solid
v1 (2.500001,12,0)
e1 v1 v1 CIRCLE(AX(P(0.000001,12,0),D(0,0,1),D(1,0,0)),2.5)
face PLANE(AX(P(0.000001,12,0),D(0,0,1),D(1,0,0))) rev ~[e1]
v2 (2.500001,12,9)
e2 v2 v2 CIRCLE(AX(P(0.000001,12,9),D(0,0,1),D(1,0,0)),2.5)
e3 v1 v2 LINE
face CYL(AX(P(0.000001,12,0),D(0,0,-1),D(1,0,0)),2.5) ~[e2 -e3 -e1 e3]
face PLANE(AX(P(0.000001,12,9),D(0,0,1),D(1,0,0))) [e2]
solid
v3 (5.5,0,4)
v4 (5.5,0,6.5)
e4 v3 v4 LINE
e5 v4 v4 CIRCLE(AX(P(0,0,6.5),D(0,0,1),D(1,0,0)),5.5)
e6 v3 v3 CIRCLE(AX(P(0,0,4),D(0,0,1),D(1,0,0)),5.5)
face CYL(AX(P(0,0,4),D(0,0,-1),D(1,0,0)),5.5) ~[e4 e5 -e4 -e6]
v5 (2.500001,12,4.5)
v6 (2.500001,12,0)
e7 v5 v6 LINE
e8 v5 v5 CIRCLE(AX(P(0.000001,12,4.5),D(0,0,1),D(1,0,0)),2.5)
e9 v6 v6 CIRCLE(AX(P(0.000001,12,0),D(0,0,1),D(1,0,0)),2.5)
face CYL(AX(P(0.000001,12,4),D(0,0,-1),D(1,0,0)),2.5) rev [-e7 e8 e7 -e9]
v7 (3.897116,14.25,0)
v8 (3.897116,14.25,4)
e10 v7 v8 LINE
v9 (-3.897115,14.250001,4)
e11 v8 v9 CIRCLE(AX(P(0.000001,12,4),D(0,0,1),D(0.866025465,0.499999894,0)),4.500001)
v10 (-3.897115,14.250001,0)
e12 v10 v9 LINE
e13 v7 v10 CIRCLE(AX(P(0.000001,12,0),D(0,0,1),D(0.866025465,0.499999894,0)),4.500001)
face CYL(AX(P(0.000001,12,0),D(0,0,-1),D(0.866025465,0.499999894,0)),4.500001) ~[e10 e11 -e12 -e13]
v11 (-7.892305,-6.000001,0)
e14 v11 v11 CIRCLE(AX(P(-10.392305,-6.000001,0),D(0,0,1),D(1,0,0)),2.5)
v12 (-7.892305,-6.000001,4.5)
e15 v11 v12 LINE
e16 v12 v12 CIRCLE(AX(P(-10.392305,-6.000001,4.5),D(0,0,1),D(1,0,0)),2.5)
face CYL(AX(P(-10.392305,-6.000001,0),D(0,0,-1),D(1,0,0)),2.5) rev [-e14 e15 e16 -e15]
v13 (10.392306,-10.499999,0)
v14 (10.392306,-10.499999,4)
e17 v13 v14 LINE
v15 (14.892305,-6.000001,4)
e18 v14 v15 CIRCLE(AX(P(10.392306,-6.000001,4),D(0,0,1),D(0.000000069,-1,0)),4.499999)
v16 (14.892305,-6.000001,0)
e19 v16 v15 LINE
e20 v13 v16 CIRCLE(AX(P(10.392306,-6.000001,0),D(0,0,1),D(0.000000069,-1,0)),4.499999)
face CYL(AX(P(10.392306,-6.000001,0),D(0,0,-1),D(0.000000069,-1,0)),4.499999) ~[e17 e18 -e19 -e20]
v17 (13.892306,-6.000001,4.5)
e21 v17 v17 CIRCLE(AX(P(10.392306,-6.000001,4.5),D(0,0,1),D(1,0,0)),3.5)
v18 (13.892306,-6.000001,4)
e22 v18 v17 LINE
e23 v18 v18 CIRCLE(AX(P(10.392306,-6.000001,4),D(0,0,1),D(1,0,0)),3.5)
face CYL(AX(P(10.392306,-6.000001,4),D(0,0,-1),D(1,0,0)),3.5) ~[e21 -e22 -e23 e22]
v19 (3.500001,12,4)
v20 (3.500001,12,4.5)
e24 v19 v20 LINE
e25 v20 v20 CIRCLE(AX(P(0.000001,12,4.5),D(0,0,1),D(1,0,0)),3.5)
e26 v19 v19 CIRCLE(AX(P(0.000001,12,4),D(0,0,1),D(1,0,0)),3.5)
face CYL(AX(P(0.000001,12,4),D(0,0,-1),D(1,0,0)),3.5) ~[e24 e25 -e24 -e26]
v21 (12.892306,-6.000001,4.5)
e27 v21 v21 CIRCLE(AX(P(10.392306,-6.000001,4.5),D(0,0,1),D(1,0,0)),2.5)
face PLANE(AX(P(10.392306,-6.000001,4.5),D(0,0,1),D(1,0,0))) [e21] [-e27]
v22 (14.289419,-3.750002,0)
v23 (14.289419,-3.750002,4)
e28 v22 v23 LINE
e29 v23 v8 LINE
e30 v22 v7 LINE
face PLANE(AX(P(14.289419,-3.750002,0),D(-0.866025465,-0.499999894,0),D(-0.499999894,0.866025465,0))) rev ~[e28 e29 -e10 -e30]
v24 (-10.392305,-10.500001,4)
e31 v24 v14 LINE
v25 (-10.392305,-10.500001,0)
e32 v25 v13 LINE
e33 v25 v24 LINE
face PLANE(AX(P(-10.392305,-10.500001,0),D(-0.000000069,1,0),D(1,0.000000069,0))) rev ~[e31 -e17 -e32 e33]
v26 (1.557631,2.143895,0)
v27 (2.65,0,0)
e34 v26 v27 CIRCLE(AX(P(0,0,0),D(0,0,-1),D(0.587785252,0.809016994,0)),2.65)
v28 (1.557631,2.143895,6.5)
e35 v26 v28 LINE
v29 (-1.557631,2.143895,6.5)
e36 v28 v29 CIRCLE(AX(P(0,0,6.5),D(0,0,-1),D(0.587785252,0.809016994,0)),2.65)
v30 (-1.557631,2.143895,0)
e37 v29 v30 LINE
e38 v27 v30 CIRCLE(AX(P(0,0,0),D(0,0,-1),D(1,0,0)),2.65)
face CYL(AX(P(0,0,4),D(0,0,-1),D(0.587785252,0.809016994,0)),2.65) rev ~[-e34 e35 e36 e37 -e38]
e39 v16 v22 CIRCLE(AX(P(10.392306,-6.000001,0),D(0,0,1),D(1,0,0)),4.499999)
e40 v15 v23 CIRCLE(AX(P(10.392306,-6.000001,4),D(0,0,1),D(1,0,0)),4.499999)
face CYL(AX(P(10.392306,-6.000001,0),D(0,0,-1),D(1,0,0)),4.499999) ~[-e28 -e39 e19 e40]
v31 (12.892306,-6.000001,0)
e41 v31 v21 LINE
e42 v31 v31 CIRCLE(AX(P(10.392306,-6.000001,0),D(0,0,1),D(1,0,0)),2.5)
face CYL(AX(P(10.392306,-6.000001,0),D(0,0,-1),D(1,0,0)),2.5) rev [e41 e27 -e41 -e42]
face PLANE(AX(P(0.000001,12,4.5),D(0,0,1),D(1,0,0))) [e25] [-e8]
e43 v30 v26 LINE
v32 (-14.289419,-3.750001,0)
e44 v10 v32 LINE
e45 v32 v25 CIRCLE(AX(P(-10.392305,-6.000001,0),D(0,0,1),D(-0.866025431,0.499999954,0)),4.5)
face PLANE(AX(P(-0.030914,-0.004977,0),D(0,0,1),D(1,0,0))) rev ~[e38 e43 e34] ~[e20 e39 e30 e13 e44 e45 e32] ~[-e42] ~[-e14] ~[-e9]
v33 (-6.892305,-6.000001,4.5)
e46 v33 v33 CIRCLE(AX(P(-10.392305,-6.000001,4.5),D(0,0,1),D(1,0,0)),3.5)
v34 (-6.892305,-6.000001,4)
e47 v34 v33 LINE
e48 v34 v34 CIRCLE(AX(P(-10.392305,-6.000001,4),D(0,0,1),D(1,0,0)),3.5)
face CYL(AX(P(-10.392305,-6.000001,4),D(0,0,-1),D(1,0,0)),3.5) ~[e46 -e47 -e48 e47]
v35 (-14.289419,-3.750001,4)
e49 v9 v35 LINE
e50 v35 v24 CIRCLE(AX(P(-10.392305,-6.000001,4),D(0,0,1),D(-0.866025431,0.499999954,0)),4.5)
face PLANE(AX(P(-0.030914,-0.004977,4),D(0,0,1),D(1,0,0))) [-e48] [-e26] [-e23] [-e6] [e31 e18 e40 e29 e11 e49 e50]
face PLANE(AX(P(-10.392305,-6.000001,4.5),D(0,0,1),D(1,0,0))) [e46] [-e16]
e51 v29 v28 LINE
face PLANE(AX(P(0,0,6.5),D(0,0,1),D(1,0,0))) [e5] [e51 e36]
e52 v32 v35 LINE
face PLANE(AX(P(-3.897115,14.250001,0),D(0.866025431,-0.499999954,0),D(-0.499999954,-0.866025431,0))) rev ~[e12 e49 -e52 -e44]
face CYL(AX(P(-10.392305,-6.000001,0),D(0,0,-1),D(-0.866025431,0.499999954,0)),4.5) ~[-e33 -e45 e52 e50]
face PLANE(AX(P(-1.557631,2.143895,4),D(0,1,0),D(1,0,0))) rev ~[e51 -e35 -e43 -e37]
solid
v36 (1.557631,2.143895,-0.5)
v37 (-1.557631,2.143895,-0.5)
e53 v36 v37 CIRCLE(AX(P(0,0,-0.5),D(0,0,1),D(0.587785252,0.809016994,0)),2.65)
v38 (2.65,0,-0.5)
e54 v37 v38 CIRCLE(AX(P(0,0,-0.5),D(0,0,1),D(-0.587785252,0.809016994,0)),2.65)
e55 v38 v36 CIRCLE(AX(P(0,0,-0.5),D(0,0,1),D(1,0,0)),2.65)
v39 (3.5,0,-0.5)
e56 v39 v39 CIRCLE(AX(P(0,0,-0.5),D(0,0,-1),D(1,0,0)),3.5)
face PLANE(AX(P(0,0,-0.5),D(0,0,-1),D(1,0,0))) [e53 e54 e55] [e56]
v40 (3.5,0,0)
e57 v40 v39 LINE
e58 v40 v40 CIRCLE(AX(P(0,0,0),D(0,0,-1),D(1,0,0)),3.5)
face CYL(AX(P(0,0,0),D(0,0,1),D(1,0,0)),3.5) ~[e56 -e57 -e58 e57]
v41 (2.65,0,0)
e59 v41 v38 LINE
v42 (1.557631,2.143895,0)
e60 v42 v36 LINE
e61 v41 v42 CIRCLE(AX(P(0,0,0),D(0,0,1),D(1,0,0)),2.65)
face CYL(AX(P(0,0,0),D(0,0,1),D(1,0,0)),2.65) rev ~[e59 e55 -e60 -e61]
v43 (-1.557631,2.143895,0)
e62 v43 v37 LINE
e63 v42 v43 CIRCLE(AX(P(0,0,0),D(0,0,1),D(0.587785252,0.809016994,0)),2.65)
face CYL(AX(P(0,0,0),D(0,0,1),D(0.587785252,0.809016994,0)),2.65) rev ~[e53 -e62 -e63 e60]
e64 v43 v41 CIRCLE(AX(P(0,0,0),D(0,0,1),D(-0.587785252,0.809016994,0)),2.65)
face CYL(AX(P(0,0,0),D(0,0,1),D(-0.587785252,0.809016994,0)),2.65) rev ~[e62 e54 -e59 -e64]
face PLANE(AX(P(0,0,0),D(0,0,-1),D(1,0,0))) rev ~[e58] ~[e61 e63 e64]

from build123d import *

# Parameters (mm, degrees)
F0_R     = 5.5000004034
F0_R_2   = 2.5
F1_DEPTH = 4
F2_R     = 5.5000004034
F3_DEPTH = 2.5
F4_R     = 3.5
F5_DEPTH = 0.5
F2_R_2   = 3.5
F2_R_3   = 2.5
F6_DEPTH = 0.5
F7_DEPTH = 9


# Not quite as in the source:
# - a feature names something its author has since deleted; it is built from what else it names


with BuildPart() as f1:
    # F0 (on Top) → F1 (new body)
    with BuildSketch(Plane.XY):
        with BuildLine():
            ThreePointArc((-14.2894193359, -3.7500009242), (-9.2276193118, -1.6533344658), (-5.8923048983, -6.0000007153))
            ThreePointArc((-5.8923048983, -6.0000007153), (-7.2103242734, -9.1819811212), (-10.3923045885, -10.5000007153))
            Line((-10.3923045885, -10.5000007153), (10.3923063941, -10.4999992847))
            ThreePointArc((10.3923063941, -10.4999992847), (6.4951930666, -3.7500013262), (14.2894194379, -3.7500019077))
            Line((14.2894194379, -3.7500019077), (3.8971161501, 14.2500004833))
            ThreePointArc((3.8971161501, 14.2500004833), (4.3466679585, 13.1646861286), (4.5000017068, 12.0000004034))
            ThreePointArc((4.5000017068, 12.0000004034), (-1.1646852817, 7.6533330781), (-3.8971148091, 14.2500007515))
            Line((-3.8971148091, 14.2500007515), (-14.2894193359, -3.7500009242))
        make_face()
        Circle(F0_R, mode=Mode.SUBTRACT)
        Circle(F0_R)
        with BuildLine():
            ThreePointArc((1.5576309186, 2.1438950351), (2.3611672891, 1.2030748243), (2.65, 0))
            ThreePointArc((2.65, 0), (-1.2030748243, -2.3611672891), (-1.5576309186, 2.1438950351))
            ThreePointArc((-1.5576309186, 2.1438950351), (0, 2.65), (1.5576309186, 2.1438950351))
        make_face(mode=Mode.SUBTRACT)
        with BuildLine():
            ThreePointArc((3.8971161501, 14.2500004833), (7.479e-07, 16.5000015172), (-3.8971148091, 14.2500007515))
            ThreePointArc((-3.8971148091, 14.2500007515), (-1.1646852817, 7.6533330781), (4.5000017068, 12.0000004034))
            ThreePointArc((4.5000017068, 12.0000004034), (4.3466679585, 13.1646861286), (3.8971161501, 14.2500004833))
        make_face()
        with Locations((5.931e-07, 12.0000004034)):
            Circle(F0_R_2, mode=Mode.SUBTRACT)
        with BuildLine():
            ThreePointArc((-10.3923045885, -10.5000007153), (-7.2103242734, -9.1819811212), (-5.8923048983, -6.0000007153))
            ThreePointArc((-5.8923048983, -6.0000007153), (-9.2276193118, -1.6533344658), (-14.2894193359, -3.7500009242))
            ThreePointArc((-14.2894193359, -3.7500009242), (-14.2894190776, -8.2500009539), (-10.3923045885, -10.5000007153))
        make_face()
        with Locations((-10.3923048983, -6.0000007153)):
            Circle(F0_R_2, mode=Mode.SUBTRACT)
        with BuildLine():
            ThreePointArc((14.2894194379, -3.7500019077), (6.4951930666, -3.7500013262), (10.3923063941, -10.4999992847))
            ThreePointArc((10.3923063941, -10.4999992847), (13.5742856976, -9.1819801095), (14.8923046537, -6.0000007153))
            ThreePointArc((14.8923046537, -6.0000007153), (14.7389709921, -4.8353156487), (14.2894194379, -3.7500019077))
        make_face()
        with Locations((10.3923060844, -6.0000007153)):
            Circle(F0_R_2, mode=Mode.SUBTRACT)
        with BuildLine():
            Line((-1.5576309186, 2.1438950351), (1.5576309186, 2.1438950351))
            ThreePointArc((1.5576309186, 2.1438950351), (0, 2.65), (-1.5576309186, 2.1438950351))
        make_face()
    extrude(amount=F1_DEPTH)

    # F2 (on face) → F3 (join)
    with BuildSketch(Plane.XY.offset(4)):
        Circle(F2_R)
        with BuildLine():
            ThreePointArc((1.5576309186, 2.1438950351), (0, -2.65), (-1.5576309186, 2.1438950351))
            Line((-1.5576309186, 2.1438950351), (1.5576309186, 2.1438950351))
        make_face(mode=Mode.SUBTRACT)
    extrude(amount=F3_DEPTH)

    # F2 (on face) → F6 (join)
    with BuildSketch(Plane.XY.offset(4)):
        with Locations((5.931e-07, 12.0000004034)):
            Circle(F2_R_2)
        with Locations((5.931e-07, 12.0000004034)):
            Circle(F2_R_3, mode=Mode.SUBTRACT)
        with Locations((-10.3923048983, -6.0000007153)):
            Circle(F2_R_2)
        with Locations((-10.3923048983, -6.0000007153)):
            Circle(F2_R_3, mode=Mode.SUBTRACT)
        with Locations((10.3923060844, -6.0000007153)):
            Circle(F2_R_2)
        with Locations((10.3923060844, -6.0000007153)):
            Circle(F2_R_3, mode=Mode.SUBTRACT)
    extrude(amount=F6_DEPTH)


with BuildPart() as f5:
    # F4 (on face) → F5 (new body)
    with BuildSketch(Plane(origin=(0, 0, 0), x_dir=(1, 0, 0), z_dir=(0, 0, -1))):
        Circle(F4_R)
        with BuildLine():
            ThreePointArc((-1.5576309186, -2.1438950351), (-1.2030748243, 2.3611672891), (2.65, 0))
            ThreePointArc((2.65, 0), (2.3611672891, -1.2030748243), (1.5576309186, -2.1438950351))
            ThreePointArc((1.5576309186, -2.1438950351), (0, -2.65), (-1.5576309186, -2.1438950351))
        make_face(mode=Mode.SUBTRACT)
    extrude(amount=F5_DEPTH)


with BuildPart() as f7:
    # F0 (on Top) → F7 (new body)
    with BuildSketch(Plane.XY):
        with Locations((5.931e-07, 12.0000004034)):
            Circle(F0_R_2)
    extrude(amount=F7_DEPTH)


solid = Compound([f1.part, f5.part, f7.part])
